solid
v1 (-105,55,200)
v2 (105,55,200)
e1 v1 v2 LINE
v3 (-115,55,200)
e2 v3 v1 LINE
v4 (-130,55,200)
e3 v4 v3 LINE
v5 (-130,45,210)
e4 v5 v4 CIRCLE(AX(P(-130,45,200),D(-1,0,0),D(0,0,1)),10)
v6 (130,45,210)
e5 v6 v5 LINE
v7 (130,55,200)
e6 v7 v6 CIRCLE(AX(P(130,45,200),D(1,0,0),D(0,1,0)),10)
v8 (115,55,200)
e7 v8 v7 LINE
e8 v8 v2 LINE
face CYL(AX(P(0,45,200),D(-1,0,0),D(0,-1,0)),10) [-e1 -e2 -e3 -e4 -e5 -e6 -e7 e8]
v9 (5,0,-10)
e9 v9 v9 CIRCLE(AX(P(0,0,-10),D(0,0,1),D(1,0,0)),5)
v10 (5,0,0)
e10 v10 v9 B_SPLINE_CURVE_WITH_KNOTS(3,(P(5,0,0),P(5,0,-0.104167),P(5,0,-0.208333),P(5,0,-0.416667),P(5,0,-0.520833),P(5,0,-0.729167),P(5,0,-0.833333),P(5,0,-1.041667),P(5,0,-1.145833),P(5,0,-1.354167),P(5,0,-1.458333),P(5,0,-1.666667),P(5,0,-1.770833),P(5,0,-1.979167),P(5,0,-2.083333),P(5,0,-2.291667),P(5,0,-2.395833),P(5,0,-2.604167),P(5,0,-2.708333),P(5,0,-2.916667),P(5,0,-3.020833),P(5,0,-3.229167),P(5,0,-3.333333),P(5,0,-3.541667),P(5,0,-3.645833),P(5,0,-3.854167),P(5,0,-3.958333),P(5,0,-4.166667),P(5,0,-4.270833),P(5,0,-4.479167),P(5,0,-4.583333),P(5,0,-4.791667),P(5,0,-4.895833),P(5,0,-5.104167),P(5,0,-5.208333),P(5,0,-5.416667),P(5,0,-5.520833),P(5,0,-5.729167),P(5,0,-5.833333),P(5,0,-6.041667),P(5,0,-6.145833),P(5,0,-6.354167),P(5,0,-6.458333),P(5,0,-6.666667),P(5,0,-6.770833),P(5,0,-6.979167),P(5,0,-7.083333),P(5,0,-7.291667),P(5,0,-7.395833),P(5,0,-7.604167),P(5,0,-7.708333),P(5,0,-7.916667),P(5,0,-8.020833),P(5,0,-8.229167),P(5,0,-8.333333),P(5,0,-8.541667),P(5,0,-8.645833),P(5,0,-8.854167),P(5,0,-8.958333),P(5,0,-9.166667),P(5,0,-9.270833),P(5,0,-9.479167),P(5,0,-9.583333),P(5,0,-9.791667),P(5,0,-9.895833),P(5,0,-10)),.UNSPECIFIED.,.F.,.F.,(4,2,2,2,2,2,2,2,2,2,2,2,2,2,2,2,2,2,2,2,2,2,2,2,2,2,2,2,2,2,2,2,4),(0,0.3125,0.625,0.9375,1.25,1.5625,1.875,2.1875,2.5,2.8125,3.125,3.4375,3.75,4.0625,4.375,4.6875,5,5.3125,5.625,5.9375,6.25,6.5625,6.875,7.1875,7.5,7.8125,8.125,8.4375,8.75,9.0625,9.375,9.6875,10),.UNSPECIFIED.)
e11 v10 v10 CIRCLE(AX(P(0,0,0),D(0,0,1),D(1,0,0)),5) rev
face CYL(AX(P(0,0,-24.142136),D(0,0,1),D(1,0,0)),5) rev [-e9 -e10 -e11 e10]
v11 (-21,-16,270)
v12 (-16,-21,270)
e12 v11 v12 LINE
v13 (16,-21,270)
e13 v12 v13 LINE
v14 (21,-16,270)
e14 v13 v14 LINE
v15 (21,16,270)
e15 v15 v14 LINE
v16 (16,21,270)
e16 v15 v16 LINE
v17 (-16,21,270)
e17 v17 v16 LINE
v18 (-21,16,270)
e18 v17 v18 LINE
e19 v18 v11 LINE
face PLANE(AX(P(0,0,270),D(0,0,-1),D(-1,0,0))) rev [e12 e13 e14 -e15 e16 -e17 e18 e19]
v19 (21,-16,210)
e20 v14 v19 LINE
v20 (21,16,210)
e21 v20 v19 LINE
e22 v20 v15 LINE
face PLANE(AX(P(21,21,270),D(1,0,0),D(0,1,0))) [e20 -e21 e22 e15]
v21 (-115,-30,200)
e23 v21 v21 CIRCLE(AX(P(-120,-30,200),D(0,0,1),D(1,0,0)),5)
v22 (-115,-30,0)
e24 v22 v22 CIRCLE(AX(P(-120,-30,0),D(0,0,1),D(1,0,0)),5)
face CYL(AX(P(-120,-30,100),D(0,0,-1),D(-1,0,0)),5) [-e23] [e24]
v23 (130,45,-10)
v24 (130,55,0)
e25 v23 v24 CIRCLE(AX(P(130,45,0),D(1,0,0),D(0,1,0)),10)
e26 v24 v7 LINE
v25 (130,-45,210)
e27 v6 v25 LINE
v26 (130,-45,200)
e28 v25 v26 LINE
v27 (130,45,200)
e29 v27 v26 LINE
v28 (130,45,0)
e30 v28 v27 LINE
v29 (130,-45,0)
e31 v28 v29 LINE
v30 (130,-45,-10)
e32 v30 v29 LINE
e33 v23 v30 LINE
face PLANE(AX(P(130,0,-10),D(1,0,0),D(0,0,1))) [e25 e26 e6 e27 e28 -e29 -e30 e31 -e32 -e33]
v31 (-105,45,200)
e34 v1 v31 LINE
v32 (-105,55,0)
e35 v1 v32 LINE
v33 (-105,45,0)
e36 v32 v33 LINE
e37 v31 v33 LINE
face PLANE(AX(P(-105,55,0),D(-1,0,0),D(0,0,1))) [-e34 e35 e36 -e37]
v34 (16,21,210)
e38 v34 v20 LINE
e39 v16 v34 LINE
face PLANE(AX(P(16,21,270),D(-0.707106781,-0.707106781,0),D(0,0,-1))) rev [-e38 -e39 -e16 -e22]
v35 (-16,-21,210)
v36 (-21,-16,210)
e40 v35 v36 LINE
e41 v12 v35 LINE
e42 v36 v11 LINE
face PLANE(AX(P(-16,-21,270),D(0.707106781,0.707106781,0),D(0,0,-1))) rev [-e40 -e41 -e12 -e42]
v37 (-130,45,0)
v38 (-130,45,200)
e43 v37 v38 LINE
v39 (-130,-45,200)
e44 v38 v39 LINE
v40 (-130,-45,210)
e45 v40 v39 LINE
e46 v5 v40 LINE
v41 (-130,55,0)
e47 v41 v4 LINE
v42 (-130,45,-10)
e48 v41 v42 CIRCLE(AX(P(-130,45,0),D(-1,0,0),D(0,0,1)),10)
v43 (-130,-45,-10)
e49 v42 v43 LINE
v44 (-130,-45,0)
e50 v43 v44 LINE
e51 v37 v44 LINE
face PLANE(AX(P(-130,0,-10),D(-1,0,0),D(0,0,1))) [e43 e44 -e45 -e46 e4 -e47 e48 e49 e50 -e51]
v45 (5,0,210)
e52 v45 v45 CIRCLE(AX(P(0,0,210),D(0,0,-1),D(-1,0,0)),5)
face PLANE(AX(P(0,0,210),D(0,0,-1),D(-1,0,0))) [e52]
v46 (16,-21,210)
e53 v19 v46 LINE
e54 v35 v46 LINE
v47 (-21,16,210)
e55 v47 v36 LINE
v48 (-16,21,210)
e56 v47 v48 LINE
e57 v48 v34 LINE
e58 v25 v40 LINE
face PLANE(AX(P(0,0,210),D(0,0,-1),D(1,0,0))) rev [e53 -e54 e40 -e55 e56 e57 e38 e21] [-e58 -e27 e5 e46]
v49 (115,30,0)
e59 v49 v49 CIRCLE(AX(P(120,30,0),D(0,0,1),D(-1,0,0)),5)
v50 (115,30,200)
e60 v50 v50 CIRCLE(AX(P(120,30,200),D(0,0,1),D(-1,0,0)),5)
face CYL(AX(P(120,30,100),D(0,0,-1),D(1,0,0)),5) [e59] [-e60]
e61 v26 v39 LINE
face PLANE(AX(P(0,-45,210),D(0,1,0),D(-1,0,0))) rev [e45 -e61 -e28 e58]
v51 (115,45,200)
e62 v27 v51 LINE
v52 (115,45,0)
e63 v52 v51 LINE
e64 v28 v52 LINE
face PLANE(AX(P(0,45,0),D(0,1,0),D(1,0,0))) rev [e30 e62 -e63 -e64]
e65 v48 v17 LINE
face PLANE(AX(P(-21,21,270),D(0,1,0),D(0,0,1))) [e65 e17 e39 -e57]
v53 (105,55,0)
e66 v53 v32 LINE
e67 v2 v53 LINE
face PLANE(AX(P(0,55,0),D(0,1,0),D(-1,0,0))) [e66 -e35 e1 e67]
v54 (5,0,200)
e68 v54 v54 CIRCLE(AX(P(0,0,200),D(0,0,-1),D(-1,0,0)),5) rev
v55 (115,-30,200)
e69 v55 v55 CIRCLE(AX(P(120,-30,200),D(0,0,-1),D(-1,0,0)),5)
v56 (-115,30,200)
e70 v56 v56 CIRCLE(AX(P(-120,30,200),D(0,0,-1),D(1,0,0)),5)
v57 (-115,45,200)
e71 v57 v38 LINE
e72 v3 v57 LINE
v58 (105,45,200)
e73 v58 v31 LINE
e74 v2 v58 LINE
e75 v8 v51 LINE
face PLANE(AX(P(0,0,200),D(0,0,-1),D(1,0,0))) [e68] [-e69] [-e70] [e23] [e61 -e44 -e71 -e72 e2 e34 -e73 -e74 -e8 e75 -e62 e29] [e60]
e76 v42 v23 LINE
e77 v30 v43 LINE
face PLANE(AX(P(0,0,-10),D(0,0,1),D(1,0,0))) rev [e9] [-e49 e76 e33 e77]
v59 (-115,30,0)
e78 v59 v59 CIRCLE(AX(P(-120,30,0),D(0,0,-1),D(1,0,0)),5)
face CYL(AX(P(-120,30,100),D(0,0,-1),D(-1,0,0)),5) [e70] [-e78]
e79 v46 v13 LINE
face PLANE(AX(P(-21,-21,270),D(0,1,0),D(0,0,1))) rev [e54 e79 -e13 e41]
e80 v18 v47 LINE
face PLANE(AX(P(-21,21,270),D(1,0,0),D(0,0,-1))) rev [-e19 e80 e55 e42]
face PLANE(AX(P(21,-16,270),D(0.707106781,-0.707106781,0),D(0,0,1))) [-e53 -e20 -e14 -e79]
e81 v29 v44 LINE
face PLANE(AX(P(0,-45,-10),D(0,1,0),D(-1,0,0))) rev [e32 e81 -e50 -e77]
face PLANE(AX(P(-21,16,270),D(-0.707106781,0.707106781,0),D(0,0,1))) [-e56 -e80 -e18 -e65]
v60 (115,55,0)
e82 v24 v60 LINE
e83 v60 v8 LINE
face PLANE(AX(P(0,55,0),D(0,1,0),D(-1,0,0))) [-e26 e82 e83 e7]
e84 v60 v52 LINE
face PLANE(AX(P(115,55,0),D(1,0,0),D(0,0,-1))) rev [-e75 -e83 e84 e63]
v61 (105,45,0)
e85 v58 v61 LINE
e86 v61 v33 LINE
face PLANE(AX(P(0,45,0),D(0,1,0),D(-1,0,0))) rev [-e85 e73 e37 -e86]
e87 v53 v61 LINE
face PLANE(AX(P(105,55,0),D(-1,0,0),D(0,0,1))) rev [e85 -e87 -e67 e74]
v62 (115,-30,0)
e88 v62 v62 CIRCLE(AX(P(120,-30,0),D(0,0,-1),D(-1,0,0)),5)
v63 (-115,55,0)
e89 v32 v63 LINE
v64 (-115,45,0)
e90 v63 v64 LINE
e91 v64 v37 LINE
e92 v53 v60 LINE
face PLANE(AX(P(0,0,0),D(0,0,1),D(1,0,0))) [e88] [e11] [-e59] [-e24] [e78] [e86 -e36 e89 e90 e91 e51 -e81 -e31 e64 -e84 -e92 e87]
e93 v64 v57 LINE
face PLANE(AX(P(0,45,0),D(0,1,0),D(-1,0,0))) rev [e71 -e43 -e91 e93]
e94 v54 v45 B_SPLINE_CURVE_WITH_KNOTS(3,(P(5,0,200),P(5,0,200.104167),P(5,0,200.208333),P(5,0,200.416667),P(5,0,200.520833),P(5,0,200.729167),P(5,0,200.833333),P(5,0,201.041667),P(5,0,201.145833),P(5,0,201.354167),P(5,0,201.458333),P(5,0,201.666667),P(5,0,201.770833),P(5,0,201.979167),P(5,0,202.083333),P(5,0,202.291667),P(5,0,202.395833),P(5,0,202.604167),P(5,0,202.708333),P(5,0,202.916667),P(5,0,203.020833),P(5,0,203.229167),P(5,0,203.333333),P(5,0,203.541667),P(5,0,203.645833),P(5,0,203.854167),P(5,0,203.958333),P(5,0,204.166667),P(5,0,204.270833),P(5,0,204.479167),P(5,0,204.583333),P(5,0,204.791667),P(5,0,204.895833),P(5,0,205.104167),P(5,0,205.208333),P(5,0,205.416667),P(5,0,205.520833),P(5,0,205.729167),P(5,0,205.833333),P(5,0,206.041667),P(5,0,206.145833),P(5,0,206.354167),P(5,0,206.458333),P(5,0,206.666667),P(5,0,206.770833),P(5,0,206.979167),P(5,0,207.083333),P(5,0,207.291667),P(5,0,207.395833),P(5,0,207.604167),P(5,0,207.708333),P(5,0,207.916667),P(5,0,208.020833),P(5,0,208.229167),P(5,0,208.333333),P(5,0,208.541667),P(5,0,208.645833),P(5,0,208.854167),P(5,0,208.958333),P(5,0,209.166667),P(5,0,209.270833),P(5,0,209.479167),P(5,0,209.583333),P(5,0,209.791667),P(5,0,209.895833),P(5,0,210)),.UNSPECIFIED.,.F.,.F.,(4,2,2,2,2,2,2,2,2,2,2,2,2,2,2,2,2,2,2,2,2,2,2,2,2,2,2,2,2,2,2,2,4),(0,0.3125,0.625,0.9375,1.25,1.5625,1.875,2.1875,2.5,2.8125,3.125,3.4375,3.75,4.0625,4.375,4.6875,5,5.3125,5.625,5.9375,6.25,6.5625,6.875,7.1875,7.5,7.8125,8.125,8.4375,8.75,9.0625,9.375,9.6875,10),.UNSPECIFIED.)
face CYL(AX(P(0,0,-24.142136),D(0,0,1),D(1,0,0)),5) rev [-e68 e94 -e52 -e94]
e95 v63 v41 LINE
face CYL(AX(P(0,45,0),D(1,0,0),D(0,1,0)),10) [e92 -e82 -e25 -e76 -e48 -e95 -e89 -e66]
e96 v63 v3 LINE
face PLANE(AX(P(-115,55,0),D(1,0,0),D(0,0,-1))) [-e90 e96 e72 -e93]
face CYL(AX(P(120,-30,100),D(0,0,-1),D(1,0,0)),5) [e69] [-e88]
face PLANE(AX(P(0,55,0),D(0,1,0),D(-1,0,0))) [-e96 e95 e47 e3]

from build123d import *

# Parameters (mm, degrees)
SKETCH1_W                      = 130
SKETCH1_H                      = 45
SKETCH1_R                      = 5
BOSS_EXTRUDE1_DEPTH            = 10
SKETCH1_5_R                    = 5
BOSS_EXTRUDE2_DEPTH            = 100
MIRROR1_START                  = -10
MIRROR1_DEPTH                  = 10
MIRROR1_2_OUTLINE_R            = 5
MIRROR1_2_DEPTH                = 100
SKETCH2_W                      = 130
SKETCH2_H                      = 220
SKETCH2_W_2                    = 10
SKETCH2_H_2                    = 200
BOSS_EXTRUDE3_DEPTH            = 10
FILLET1_START                  = -131
FILLET1_DEPTH                  = 262
SKETCH3_W                      = 42
SKETCH3_H                      = 42
BOSS_EXTRUDE4_DEPTH            = 60
CHAMFER1_SIZE                  = 5
SKETCH4_R                      = 5
CUT_EXTRUDE1_DEPTH             = 10
CUT_EXTRUDE1_DIRECTION_2_REACH = 255.032


with BuildPart() as part:
    # Sketch1 → Boss-Extrude1 (new body)
    # profile 1 of 2: a face of its own
    with BuildSketch(Plane(origin=(0, 0, 0), x_dir=(1, 0, 0), z_dir=(0, 0, -1))):
        with Locations((-65, 22.5)):
            Rectangle(SKETCH1_W, SKETCH1_H)
        with Locations((-120, 30)):
            Circle(SKETCH1_R, mode=Mode.SUBTRACT)
    # profile 2 of 2: a face of its own
    with BuildSketch(Plane(origin=(0, 0, 0), x_dir=(1, 0, 0), z_dir=(0, 0, -1))):
        with Locations((-120, 30)):
            Circle(SKETCH1_R)
    extrude(amount=BOSS_EXTRUDE1_DEPTH)

    # Sketch1<5> → Boss-Extrude2 (add)
    with BuildSketch(Plane(origin=(0, 0, 0), x_dir=(1, 0, 0), z_dir=(0, 0, -1))):
        with Locations(Location((-120, 30, 0), (0, 0, 180))):
            Circle(SKETCH1_5_R)
    extrude(amount=-BOSS_EXTRUDE2_DEPTH)

    # Mirror1: read off the stored shape, not the designer's step
    # Mirror1 outline → Mirror1 (add)
    with BuildSketch(Plane.XY.offset(MIRROR1_START)):
        Polygon((130, 45), (-130, 45), (-130, 0), (0, 0), (0, -45), (130, -45), align=None)
    extrude(amount=MIRROR1_DEPTH)

    # Mirror1 2 outline → Mirror1 2 (add)
    with BuildSketch(Plane.XY):
        with Locations((120, -30)):
            Circle(MIRROR1_2_OUTLINE_R)
        with Locations((-120, 30)):
            Circle(MIRROR1_2_OUTLINE_R)
        with Locations((120, 30)):
            Circle(MIRROR1_2_OUTLINE_R)
    extrude(amount=MIRROR1_2_DEPTH)

    # Mirror2: part across plane


with BuildPart() as part_1:
    add(part.part)
    add(part.part.mirror(Plane(origin=(120, -30, 100), x_dir=(1, 0, 0), z_dir=(0, 0, -1))))

    # Sketch2 → Boss-Extrude3 (add)
    with BuildSketch(Plane(origin=(0, 45, 0), x_dir=(1, 0, 0), z_dir=(0, 1, 0))):
        with Locations((-65, -100)):
            Rectangle(SKETCH2_W, SKETCH2_H)
        with Locations((-110, -100)):
            Rectangle(SKETCH2_W_2, SKETCH2_H_2, mode=Mode.SUBTRACT)
    boss_extrude3 = extrude(amount=BOSS_EXTRUDE3_DEPTH)

    # Mirror3: Boss-Extrude3 across plane
    add(boss_extrude3.mirror(Plane(origin=(0, 55, -10), x_dir=(0, 0, 1), z_dir=(-1, 0, 0))))

    # Fillet1: read off the stored shape, not the designer's step
    # Fillet1 outline → Fillet1 (cut)
    with BuildSketch(Plane.YZ.offset(FILLET1_START)):
        with BuildLine():
            ThreePointArc((45, 210), (52.071067812, 207.071067812), (55, 200))
            Line((55, 200), (55, 210))
            Line((55, 210), (45, 210))
        make_face()
        with BuildLine():
            ThreePointArc((55, 0), (52.071067812, -7.071067812), (45, -10))
            Line((45, -10), (55, -10))
            Line((55, -10), (55, 0))
        make_face()
    extrude(amount=FILLET1_DEPTH, mode=Mode.SUBTRACT)

    # Sketch3 → Boss-Extrude4 (add)
    with BuildSketch(Plane.XY.offset(210)):
        Rectangle(SKETCH3_W, SKETCH3_H)
    extrude(amount=BOSS_EXTRUDE4_DEPTH)

    # Chamfer1
    chamfer1_edges = [part_1.edges().sort_by_distance(p)[0] for p in [
        (-21, -21, 240),
        (21, -21, 240),
        (21, 21, 240),
        (-21, 21, 240),
    ]]
    chamfer(chamfer1_edges, length=CHAMFER1_SIZE)

    # Sketch4 → Cut-Extrude1 (cut)
    with BuildSketch(Plane(origin=(0, 0, 200), x_dir=(-1, 0, 0), z_dir=(0, 0, -1))):
        with Locations(Location((0, 0, 0), (0, 0, 180))):
            Circle(SKETCH4_R)
    extrude(amount=-CUT_EXTRUDE1_DEPTH, mode=Mode.SUBTRACT)

    # Cut-Extrude1 direction 2: up to this face of the body (flat: up to its plane)
    cut_extrude1_direction_2_end = Plane(part_1.part.faces().sort_by_distance((0, 0, -10))[0])
    # Sketch4 → Cut-Extrude1 direction 2 (cut, up to the picked face)
    with BuildSketch(Plane(origin=(0, 0, 200), x_dir=(-1, 0, 0), z_dir=(0, 0, -1)), mode=Mode.PRIVATE) as cut_extrude1_direction_2_sk1:
        with Locations(Location((0, 0, 0), (0, 0, 180))):
            Circle(SKETCH4_R)
    cut_extrude1_direction_2_tool1 = split(extrude(cut_extrude1_direction_2_sk1.sketch, amount=CUT_EXTRUDE1_DIRECTION_2_REACH, mode=Mode.PRIVATE), bisect_by=cut_extrude1_direction_2_end, keep=Keep.BOTH, mode=Mode.PRIVATE)
    add(cut_extrude1_direction_2_tool1.solids().sort_by(Axis((0, 0, 200), (0, 0, -1)))[0], mode=Mode.SUBTRACT)


solid = part_1.part
